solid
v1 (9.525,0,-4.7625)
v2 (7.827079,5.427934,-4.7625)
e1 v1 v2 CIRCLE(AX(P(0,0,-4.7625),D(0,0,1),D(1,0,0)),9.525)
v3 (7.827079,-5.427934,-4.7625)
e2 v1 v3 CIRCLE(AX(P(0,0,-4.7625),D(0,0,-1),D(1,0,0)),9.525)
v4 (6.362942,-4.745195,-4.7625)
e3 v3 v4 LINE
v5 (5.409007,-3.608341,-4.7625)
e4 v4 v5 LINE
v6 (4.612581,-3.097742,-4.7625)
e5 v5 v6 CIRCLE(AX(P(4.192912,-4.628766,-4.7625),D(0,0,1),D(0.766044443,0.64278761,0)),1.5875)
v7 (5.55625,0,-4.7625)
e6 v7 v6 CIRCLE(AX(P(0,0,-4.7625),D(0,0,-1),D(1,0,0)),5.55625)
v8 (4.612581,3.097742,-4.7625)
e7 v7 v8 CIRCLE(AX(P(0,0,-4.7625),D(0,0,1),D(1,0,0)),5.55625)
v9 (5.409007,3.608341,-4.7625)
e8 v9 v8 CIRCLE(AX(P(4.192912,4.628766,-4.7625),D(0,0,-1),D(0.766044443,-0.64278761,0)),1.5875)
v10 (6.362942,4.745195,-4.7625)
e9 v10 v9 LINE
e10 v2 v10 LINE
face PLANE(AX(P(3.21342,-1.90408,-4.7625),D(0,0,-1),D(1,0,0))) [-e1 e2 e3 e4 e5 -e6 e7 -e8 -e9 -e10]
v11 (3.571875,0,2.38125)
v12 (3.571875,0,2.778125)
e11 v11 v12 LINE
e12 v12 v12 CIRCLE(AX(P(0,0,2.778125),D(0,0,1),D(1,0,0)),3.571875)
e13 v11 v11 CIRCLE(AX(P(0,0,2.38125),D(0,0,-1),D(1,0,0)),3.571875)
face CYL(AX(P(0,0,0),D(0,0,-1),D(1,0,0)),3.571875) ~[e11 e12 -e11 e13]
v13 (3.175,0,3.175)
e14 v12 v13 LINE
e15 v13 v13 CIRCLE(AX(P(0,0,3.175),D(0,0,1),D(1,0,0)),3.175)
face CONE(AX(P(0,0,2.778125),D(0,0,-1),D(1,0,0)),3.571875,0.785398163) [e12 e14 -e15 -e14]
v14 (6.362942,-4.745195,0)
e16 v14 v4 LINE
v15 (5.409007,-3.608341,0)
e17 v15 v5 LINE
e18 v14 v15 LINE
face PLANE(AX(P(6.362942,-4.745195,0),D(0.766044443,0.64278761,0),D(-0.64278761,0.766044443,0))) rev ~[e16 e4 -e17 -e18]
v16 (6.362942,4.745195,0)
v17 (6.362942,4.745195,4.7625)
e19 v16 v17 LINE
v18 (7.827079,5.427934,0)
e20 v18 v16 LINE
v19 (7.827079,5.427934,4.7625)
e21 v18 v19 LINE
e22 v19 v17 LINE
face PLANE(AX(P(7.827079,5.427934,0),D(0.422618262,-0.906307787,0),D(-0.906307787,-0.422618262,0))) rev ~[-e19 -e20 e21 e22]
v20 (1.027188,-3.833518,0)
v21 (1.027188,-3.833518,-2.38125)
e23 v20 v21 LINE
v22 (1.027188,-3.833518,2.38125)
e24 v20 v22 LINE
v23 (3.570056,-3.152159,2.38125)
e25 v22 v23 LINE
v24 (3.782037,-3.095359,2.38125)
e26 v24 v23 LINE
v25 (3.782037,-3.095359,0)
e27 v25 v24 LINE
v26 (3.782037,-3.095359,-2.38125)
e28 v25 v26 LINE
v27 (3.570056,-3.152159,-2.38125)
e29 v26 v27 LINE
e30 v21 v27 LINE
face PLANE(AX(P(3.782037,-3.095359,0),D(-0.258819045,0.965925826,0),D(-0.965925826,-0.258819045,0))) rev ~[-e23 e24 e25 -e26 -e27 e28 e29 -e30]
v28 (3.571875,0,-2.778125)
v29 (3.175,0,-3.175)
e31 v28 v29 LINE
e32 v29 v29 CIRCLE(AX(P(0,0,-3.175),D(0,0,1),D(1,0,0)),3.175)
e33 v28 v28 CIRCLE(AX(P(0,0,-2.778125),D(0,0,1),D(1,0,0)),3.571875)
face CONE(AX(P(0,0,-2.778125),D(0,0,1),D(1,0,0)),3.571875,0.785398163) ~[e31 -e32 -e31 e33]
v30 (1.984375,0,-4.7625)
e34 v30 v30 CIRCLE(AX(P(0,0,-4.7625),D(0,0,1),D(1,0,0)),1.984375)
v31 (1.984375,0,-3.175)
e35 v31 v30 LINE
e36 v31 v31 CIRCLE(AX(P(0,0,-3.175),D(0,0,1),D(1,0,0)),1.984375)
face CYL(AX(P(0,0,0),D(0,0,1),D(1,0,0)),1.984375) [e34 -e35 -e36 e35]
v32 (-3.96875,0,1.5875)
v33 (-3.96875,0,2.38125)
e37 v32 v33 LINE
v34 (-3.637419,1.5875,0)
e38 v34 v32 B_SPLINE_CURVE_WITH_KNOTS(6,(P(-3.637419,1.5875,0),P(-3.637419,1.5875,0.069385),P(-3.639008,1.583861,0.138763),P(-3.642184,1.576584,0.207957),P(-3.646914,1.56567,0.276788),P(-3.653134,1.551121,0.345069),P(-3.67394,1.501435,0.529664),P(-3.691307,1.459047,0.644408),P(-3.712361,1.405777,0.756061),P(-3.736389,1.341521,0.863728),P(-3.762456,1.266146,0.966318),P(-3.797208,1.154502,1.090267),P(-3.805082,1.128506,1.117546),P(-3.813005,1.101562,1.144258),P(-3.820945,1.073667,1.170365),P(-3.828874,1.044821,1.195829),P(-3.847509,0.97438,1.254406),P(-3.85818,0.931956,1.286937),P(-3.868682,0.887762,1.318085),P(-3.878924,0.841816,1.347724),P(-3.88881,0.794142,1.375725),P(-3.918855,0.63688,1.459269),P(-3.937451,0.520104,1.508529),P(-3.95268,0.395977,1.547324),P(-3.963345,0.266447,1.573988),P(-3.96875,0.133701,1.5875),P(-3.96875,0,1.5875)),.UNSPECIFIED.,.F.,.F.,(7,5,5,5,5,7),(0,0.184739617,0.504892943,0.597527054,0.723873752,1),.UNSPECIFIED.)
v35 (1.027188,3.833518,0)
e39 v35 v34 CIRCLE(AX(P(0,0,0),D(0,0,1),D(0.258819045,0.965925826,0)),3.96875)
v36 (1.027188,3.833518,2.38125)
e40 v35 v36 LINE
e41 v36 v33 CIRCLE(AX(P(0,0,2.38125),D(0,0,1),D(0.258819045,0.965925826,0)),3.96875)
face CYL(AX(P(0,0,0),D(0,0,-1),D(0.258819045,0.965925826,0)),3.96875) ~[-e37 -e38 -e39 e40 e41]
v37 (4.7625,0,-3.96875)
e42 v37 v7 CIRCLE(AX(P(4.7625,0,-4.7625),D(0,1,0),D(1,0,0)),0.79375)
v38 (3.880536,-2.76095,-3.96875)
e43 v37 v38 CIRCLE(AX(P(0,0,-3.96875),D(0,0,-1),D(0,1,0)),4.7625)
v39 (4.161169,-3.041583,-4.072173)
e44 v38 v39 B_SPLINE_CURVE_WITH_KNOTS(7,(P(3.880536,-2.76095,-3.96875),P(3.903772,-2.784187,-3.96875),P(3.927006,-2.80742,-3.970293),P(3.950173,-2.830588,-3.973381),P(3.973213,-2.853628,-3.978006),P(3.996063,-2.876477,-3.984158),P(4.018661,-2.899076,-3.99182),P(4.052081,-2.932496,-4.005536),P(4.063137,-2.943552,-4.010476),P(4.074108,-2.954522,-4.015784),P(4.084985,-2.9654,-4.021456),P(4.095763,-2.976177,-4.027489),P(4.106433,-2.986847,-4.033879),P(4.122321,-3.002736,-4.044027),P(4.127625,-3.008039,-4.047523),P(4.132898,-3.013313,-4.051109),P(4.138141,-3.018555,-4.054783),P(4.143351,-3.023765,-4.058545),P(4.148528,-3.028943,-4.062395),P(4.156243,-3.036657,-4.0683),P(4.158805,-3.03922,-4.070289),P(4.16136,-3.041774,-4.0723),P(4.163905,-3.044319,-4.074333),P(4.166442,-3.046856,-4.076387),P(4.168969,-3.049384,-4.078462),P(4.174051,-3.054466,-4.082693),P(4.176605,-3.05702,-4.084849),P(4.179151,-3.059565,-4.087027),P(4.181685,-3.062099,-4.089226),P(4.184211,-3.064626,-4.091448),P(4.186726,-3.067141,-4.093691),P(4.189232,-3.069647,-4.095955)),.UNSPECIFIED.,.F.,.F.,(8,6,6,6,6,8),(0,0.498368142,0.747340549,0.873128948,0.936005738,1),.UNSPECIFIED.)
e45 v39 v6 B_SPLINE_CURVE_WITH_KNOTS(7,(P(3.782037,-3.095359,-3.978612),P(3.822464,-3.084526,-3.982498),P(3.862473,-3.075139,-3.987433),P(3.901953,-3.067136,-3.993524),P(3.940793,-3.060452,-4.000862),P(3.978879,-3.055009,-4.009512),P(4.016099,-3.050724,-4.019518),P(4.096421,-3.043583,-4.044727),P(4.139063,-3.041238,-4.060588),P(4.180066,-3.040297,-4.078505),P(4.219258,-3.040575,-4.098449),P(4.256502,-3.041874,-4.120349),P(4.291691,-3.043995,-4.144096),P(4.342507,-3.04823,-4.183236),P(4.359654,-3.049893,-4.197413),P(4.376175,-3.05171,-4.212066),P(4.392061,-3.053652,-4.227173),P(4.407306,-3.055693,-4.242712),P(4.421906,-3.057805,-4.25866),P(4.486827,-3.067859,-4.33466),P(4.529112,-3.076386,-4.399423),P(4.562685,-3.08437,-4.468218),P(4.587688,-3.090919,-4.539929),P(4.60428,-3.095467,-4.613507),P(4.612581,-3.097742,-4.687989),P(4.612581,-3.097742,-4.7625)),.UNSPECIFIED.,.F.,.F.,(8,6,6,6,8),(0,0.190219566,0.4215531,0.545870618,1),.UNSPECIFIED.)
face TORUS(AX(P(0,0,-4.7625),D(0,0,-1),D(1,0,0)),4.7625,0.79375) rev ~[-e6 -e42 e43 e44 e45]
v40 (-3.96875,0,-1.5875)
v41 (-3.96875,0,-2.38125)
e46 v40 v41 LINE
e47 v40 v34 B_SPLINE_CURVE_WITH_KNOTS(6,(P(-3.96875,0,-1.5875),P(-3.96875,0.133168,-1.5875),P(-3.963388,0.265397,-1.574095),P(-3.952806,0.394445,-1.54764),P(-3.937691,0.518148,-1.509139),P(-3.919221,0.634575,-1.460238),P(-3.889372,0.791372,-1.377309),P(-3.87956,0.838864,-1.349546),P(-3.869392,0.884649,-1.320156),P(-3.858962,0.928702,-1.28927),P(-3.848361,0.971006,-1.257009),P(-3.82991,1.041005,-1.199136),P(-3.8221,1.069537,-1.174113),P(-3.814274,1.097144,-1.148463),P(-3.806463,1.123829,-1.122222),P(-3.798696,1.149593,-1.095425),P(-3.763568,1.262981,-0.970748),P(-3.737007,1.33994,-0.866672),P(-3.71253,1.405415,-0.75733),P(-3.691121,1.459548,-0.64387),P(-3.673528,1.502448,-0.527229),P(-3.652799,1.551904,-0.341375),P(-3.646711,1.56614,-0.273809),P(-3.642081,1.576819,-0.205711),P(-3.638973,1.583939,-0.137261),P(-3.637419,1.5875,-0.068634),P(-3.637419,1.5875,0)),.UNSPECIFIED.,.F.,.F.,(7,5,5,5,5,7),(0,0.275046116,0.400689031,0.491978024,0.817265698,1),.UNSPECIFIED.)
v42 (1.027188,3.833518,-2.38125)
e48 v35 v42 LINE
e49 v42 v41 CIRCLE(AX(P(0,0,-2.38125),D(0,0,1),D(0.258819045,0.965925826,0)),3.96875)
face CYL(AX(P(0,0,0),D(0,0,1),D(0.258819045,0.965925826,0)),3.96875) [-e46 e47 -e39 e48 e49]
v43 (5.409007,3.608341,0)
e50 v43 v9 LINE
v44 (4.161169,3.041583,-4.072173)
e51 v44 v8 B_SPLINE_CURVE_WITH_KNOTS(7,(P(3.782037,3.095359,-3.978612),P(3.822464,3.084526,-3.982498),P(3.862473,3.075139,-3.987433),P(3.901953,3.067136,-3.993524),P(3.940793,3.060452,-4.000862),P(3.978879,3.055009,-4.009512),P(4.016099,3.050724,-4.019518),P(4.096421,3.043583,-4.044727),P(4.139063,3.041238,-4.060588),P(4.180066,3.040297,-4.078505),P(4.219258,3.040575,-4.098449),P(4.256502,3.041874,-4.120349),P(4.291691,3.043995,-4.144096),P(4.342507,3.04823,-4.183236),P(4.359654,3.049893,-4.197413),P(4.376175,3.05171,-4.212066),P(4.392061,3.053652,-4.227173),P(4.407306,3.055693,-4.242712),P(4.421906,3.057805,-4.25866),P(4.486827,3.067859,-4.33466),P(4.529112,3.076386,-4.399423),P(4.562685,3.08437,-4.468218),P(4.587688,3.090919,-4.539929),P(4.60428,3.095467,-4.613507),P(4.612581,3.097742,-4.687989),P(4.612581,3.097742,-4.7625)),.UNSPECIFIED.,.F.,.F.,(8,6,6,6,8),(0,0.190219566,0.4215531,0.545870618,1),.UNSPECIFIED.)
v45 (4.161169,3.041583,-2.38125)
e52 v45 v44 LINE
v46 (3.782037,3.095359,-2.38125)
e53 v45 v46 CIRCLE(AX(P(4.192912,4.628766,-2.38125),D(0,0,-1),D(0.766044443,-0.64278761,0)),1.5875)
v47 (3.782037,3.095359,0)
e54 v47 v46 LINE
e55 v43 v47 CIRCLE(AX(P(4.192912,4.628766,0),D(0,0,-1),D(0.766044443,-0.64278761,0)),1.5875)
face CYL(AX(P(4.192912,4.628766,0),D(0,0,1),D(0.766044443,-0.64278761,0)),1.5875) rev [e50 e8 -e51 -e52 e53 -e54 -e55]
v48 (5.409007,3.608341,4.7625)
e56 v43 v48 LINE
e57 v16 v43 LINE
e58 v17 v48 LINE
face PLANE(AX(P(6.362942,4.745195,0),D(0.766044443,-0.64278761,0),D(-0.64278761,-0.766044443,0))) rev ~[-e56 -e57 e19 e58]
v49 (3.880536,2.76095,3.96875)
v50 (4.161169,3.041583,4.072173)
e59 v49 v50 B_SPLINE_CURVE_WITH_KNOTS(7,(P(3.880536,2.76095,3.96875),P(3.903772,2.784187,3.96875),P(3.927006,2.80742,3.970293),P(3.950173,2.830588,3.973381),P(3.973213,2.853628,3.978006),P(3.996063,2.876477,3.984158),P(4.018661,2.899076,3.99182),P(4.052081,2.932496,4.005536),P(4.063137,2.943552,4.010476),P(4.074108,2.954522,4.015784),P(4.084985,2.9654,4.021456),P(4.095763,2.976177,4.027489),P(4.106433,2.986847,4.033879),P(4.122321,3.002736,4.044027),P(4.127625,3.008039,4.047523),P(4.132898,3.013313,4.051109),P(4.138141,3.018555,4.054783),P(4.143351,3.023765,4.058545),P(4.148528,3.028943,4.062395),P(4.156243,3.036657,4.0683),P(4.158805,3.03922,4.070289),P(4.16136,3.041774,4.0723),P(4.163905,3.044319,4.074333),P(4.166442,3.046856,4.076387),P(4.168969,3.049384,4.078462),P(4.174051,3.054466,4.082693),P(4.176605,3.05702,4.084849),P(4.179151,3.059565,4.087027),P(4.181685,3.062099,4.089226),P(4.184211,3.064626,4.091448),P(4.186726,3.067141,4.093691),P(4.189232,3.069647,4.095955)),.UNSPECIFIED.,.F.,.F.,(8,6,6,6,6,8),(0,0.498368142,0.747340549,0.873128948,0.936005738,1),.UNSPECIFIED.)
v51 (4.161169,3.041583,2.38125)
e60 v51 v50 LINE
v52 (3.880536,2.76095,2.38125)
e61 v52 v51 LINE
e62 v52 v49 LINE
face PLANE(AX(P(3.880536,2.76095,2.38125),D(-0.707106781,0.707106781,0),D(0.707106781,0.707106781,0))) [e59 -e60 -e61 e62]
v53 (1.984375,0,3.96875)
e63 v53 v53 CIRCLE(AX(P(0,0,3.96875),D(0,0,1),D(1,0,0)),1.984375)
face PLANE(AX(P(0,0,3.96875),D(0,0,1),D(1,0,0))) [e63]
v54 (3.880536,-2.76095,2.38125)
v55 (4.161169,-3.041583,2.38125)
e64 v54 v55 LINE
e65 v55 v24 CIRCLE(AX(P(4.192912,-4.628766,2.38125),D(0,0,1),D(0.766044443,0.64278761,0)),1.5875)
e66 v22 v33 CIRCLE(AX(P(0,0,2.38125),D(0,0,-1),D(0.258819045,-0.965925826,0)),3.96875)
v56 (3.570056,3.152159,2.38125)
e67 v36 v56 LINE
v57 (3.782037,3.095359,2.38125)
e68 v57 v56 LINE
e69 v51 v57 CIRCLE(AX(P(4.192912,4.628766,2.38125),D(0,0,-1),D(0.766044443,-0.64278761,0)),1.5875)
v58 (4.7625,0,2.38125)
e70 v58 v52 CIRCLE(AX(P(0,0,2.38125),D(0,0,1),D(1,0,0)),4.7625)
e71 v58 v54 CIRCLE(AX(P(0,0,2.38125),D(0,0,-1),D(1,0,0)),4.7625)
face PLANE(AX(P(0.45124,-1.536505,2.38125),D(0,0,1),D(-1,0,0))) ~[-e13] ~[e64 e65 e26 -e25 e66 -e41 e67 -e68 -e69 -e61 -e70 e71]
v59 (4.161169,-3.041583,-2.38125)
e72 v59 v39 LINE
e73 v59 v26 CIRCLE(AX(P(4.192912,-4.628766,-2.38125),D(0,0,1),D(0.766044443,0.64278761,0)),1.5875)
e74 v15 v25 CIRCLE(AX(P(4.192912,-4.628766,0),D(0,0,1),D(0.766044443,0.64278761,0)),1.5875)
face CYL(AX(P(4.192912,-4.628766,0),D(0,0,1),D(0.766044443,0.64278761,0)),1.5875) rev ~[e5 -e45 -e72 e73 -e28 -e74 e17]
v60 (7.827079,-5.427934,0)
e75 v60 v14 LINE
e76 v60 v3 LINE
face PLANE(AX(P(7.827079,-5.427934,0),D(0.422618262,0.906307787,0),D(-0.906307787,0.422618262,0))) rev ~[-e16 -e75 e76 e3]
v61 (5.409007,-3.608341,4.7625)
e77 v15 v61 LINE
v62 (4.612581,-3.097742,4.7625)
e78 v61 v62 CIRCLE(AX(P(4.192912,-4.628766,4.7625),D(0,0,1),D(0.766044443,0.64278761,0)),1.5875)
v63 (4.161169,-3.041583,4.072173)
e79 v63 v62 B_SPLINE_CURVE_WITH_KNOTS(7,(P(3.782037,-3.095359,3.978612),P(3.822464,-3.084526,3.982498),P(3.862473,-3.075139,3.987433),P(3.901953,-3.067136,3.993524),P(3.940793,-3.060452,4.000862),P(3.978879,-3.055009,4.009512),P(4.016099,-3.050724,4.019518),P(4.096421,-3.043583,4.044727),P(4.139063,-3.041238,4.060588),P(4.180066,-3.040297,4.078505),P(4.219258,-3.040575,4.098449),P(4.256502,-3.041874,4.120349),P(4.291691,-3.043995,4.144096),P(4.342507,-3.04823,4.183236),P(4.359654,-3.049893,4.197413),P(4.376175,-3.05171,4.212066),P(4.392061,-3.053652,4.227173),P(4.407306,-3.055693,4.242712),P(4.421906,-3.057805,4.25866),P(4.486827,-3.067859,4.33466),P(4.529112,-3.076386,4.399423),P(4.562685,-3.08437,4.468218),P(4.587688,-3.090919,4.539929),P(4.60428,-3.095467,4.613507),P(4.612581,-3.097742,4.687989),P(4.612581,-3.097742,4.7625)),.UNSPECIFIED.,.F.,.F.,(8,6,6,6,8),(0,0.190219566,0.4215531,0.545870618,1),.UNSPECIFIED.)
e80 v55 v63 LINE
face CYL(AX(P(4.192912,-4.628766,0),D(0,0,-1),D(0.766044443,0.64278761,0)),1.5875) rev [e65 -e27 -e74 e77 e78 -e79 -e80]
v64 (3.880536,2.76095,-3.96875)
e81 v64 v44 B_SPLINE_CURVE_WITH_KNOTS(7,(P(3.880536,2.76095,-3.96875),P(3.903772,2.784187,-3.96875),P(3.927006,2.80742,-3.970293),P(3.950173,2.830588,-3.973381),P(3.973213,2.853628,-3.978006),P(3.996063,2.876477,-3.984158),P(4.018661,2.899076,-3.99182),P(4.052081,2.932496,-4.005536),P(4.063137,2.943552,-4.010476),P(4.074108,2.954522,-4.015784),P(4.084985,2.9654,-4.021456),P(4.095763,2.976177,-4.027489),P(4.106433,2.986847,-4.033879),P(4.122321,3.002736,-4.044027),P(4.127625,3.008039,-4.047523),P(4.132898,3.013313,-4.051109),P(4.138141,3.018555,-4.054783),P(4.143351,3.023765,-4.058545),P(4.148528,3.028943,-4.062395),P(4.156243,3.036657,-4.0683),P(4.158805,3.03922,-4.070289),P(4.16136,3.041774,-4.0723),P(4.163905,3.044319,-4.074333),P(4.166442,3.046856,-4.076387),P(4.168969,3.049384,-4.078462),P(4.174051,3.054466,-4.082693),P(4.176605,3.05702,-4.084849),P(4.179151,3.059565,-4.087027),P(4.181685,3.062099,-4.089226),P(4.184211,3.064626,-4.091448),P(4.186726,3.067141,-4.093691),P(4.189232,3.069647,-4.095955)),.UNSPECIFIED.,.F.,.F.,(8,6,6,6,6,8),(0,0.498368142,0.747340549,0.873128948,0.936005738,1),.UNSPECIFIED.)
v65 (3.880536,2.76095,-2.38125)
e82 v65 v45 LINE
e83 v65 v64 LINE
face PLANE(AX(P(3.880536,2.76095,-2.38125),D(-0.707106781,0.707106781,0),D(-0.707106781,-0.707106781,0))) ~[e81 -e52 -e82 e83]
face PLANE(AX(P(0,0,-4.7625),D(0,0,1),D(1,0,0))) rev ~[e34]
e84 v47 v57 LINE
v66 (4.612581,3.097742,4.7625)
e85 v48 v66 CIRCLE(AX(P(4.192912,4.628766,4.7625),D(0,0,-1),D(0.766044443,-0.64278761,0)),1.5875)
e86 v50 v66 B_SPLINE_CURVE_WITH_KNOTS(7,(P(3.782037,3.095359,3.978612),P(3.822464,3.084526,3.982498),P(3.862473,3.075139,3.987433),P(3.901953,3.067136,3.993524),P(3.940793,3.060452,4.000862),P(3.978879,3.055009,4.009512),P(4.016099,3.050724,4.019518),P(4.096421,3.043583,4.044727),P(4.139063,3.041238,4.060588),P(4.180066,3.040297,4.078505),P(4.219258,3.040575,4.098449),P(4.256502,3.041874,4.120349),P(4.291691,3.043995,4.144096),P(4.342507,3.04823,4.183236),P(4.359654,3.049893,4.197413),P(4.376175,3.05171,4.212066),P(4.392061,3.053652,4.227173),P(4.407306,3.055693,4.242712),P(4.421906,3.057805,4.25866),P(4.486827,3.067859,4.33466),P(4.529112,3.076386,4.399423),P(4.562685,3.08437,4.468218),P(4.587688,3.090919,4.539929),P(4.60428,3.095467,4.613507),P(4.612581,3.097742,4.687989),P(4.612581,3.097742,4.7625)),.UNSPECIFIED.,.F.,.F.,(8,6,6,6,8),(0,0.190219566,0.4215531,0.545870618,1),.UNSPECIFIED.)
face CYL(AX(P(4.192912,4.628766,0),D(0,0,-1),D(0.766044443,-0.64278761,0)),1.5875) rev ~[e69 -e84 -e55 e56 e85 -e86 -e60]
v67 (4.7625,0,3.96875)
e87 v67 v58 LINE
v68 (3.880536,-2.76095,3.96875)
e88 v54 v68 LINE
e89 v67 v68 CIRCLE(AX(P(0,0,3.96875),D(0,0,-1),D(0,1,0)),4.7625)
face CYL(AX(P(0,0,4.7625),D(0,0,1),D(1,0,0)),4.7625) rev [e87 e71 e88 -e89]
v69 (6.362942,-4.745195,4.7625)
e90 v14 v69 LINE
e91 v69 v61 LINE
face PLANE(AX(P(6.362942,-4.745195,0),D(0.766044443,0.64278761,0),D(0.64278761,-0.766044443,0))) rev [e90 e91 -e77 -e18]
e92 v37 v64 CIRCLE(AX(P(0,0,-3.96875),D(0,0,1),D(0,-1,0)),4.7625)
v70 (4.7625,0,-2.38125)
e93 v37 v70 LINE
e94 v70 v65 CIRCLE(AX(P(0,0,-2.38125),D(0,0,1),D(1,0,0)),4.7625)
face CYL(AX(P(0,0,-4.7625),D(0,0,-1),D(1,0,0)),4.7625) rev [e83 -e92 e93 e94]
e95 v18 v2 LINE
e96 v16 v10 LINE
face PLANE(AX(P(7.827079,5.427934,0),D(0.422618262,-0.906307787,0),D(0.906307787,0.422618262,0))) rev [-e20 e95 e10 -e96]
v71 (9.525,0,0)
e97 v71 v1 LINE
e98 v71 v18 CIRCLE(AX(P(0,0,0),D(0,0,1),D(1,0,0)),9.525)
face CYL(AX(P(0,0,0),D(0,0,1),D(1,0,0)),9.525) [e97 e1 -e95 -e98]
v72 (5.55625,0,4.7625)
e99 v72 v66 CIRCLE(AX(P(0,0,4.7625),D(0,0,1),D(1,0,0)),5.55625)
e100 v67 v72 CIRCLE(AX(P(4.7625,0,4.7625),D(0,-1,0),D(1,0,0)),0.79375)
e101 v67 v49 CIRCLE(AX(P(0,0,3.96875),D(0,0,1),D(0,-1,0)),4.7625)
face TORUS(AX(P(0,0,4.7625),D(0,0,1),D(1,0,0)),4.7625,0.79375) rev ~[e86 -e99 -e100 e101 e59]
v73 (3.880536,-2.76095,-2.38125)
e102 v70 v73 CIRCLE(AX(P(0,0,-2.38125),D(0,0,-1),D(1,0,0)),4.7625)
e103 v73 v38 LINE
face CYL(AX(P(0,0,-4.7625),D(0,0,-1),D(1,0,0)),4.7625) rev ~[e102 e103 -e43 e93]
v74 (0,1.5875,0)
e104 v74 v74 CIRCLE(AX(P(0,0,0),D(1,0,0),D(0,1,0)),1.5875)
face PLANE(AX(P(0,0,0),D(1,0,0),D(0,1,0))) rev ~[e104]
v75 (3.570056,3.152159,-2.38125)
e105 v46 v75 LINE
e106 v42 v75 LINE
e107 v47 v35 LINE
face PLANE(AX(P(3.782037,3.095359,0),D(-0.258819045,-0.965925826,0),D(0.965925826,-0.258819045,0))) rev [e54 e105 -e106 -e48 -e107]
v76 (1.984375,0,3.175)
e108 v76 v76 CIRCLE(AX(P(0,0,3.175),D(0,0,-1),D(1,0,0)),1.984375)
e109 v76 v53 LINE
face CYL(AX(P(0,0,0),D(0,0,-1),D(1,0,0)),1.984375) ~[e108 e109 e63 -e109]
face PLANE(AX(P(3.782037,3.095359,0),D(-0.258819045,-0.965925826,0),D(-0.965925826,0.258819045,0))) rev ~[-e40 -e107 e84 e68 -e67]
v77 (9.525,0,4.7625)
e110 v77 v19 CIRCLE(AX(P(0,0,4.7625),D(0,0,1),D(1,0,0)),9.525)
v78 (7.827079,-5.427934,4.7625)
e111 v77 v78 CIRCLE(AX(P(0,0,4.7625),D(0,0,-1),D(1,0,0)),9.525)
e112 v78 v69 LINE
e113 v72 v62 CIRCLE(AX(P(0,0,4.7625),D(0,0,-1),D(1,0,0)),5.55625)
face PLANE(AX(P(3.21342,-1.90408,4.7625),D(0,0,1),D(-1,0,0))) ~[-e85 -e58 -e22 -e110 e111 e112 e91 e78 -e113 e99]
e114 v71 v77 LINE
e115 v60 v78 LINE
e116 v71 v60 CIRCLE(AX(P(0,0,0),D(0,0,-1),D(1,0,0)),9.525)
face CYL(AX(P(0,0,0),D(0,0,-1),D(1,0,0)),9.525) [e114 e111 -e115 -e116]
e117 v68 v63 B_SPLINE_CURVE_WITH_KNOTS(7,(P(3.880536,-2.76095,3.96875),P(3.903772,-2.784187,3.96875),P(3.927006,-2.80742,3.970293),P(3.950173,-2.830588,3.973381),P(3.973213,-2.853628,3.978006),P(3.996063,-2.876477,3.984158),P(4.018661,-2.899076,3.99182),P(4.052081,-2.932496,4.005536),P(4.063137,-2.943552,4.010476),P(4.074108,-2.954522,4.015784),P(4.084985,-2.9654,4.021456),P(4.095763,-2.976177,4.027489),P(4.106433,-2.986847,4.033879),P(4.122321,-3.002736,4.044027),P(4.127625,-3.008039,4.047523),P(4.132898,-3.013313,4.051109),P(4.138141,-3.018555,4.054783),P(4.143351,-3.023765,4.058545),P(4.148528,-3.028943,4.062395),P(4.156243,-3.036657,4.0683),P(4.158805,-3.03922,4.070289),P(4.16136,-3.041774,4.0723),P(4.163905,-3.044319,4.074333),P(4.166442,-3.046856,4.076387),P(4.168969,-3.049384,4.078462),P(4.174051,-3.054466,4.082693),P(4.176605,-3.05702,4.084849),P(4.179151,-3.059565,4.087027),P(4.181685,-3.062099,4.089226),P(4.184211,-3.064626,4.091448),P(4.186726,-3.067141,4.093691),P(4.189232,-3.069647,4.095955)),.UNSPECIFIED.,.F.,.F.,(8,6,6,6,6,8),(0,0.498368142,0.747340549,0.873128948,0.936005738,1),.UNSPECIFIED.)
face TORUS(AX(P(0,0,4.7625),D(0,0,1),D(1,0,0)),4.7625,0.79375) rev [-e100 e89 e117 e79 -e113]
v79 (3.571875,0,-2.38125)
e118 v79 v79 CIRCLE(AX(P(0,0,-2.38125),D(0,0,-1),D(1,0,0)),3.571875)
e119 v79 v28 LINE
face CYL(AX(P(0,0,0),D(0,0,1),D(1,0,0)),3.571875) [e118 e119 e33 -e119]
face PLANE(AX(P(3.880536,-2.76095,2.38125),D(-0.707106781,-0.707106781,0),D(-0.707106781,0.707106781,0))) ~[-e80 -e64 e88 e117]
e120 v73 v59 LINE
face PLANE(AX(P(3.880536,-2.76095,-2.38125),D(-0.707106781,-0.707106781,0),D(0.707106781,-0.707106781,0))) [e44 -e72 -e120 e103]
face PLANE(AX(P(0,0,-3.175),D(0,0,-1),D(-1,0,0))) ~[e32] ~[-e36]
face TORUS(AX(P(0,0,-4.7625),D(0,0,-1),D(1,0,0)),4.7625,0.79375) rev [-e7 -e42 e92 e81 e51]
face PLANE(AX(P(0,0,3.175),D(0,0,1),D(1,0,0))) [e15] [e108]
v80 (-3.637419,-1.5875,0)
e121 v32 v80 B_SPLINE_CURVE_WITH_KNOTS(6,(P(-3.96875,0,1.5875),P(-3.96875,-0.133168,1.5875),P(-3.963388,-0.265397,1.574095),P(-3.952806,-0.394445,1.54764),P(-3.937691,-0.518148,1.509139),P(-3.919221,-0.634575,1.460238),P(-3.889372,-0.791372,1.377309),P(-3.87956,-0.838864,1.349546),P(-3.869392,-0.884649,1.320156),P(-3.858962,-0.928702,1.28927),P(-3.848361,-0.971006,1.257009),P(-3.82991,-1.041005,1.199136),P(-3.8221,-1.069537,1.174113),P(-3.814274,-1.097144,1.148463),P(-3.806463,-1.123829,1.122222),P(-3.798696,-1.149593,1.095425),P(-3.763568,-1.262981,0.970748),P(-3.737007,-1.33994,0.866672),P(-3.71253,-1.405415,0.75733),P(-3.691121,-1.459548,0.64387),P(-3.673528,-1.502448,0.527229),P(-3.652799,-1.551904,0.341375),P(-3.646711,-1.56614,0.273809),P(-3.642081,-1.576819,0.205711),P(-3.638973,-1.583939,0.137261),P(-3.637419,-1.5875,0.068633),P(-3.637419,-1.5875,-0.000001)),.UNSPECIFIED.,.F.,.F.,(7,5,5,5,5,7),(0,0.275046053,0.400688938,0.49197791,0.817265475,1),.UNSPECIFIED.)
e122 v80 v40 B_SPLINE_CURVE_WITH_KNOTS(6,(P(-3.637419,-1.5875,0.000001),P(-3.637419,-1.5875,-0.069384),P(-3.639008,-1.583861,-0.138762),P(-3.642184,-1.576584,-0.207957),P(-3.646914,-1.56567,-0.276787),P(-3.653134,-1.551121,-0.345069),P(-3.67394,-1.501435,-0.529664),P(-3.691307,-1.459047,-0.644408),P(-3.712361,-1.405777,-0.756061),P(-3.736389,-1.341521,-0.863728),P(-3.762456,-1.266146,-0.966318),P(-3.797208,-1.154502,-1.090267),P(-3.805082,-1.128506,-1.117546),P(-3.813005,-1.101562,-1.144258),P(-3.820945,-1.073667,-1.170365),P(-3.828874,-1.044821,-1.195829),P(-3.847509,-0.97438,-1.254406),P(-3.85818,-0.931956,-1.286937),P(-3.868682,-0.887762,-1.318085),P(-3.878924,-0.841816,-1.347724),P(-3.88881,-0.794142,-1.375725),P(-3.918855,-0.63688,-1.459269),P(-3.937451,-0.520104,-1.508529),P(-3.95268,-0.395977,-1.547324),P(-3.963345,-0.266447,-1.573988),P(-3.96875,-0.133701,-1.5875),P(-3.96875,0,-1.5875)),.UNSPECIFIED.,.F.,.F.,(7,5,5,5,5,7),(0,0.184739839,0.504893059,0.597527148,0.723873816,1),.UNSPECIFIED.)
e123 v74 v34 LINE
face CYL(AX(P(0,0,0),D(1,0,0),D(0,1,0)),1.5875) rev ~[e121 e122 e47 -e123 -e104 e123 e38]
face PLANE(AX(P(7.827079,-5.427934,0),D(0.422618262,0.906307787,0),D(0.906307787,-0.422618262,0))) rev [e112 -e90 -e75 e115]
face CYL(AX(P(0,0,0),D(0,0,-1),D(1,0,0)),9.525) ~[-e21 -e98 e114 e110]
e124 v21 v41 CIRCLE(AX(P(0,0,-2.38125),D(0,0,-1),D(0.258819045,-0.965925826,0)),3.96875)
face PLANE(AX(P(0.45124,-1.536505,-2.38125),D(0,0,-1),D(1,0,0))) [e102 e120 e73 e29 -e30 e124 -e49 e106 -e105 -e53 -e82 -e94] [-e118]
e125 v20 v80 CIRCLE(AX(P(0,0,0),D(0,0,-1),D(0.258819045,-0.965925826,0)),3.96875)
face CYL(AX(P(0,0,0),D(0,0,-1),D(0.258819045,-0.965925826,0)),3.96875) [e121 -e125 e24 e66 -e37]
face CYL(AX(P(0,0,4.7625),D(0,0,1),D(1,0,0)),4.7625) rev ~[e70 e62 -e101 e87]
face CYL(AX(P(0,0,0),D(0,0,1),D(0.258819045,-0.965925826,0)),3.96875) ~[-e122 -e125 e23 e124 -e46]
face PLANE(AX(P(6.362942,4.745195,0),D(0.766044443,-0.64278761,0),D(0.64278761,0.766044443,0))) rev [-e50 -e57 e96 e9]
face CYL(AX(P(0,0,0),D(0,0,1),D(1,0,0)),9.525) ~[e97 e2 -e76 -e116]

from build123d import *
from build123d import SkipClean  # not in build123d's __all__

# Parameters (mm, degrees)
F1_DEPTH       = 4.7625
F3_DEPTH       = 2.38125
F4_R           = 0.79375
F8_DEPTH       = 25.4
F10_R          = 3.571875
F11_DEPTH      = 3.175
F13_SIZE2      = 0.396875
F13_SIZE       = 0.396875
F12_R          = 1.984375
F15_DEPTH      = 3.96875
F15_DEPTH_BACK = 4.7625
F16_R          = 1.5875
F17_DEPTH      = 25.4


with BuildPart() as f1:
    # F0 (on Top) → F1 (new body)
    with BuildSketch(Plane.XY):
        with BuildLine():
            Line((7.8270786991, 5.4279336804), (6.3629416959, 4.7451953832))
            Line((6.3629416959, 4.7451953832), (5.4090072937, 3.6083406323))
            ThreePointArc((5.4090072937, 3.6083406323), (4.670282197, 3.1147403034), (3.7820365062, 3.0953587134))
            Line((3.7820365062, 3.0953587134), (1.0271880853, 3.8335181231))
            ThreePointArc((1.0271880853, 3.8335181231), (-2.4160219214, 3.1486210693), (-3.96875, 0))
            Line((-3.96875, 0), (9.525, 0))
            ThreePointArc((9.525, 0), (9.0906146549, 2.8436508568), (7.8270786991, 5.4279336804))
        make_face()
    extrude(amount=F1_DEPTH)

    # F2 (on face) → F3 (cut)
    with BuildSketch(Plane.XY.offset(4.7625)):
        with BuildLine():
            Line((3.5700563335, 3.1521586295), (1.0271880853, 3.8335181231))
            ThreePointArc((1.0271880853, 3.8335181231), (-2.4160219214, 3.1486210693), (-3.96875, 0))
            Line((-3.96875, 0), (4.7625, 0))
            ThreePointArc((4.7625, 0), (4.4544247405, 1.6850835234), (3.5700563335, 3.1521586295))
        make_face()
    extrude(amount=-F3_DEPTH, mode=Mode.SUBTRACT)

    # F6: sweep along a path in F5
    with BuildLine(Plane.XY.offset(4.7625)) as f6_path:
        ThreePointArc((4.7625, 0), (4.4544247405, 1.6850835234), (3.5700563335, 3.1521586295))
    # F4 (on Front) → F6 (sweep, cut)
    with BuildSketch(Plane.XZ):
        with Locations((4.7625, 4.7625)):
            Circle(F4_R)
    sweep(path=f6_path.line, mode=Mode.SUBTRACT)

    # F7 (on face) → F8 (cut)
    with BuildSketch(Plane.XY.offset(2.38125)):
        with BuildLine():
            ThreePointArc((3.5700563335, 3.1521586295), (3.7304279124, 2.9606272714), (3.880535973, 2.7609503459))
            Line((3.880535973, 2.7609503459), (4.1611689768, 3.0415833497))
            Line((4.1611689768, 3.0415833497), (4.1606985033, 3.6664465442))
            Line((4.1606985033, 3.6664465442), (2.6852940209, 3.5708183423))
            Line((2.6852940209, 3.5708183423), (3.1285953124, 3.2704477536))
            Line((3.1285953124, 3.2704477536), (3.5700563335, 3.1521586295))
        make_face()
    extrude(amount=F8_DEPTH, mode=Mode.SUBTRACT)

    # F9: F1 across face


with BuildPart() as f1_1:
    add(f1.part, clean=False)
    with SkipClean():  # cleaning this boolean's faces spoils the solid; the shape is the same uncleaned
        add(f1.part.mirror(Plane(origin=(3.9033700373, 0, 1.7817262918), x_dir=(1, 0, 0), z_dir=(0, -1, 0))), clean=False)

    # F10 (on Top) → F11 (join)
    with BuildSketch(Plane.XY):
        Circle(F10_R)
    extrude(amount=F11_DEPTH)

    # F13
    f13_edges = [f1_1.edges().sort_by_distance(p)[0] for p in [
        (-3.571875, 0, 3.175),
    ]]
    chamfer(f13_edges, length=F13_SIZE, length2=F13_SIZE2)

    # F14: F1 across plane


with BuildPart() as f1_2:
    add(f1_1.part, clean=False)
    add(f1_1.part.mirror(Plane.XY), clean=False)

    # F12 (on Top) → F15 (join, two sides)
    with BuildSketch(Plane.XY) as f15_sk:
        Circle(F12_R)
    with SkipClean():  # cleaning this boolean's faces spoils the solid; the shape is the same uncleaned
        extrude(amount=F15_DEPTH)
        extrude(f15_sk.sketch, amount=-F15_DEPTH_BACK)

    # F16 (on Right) → F17 (cut)
    with BuildSketch(Plane.YZ):
        Circle(F16_R)
    with SkipClean():  # cleaning this boolean's faces spoils the solid; the shape is the same uncleaned
        extrude(amount=-F17_DEPTH, mode=Mode.SUBTRACT)


solid = f1_2.part
